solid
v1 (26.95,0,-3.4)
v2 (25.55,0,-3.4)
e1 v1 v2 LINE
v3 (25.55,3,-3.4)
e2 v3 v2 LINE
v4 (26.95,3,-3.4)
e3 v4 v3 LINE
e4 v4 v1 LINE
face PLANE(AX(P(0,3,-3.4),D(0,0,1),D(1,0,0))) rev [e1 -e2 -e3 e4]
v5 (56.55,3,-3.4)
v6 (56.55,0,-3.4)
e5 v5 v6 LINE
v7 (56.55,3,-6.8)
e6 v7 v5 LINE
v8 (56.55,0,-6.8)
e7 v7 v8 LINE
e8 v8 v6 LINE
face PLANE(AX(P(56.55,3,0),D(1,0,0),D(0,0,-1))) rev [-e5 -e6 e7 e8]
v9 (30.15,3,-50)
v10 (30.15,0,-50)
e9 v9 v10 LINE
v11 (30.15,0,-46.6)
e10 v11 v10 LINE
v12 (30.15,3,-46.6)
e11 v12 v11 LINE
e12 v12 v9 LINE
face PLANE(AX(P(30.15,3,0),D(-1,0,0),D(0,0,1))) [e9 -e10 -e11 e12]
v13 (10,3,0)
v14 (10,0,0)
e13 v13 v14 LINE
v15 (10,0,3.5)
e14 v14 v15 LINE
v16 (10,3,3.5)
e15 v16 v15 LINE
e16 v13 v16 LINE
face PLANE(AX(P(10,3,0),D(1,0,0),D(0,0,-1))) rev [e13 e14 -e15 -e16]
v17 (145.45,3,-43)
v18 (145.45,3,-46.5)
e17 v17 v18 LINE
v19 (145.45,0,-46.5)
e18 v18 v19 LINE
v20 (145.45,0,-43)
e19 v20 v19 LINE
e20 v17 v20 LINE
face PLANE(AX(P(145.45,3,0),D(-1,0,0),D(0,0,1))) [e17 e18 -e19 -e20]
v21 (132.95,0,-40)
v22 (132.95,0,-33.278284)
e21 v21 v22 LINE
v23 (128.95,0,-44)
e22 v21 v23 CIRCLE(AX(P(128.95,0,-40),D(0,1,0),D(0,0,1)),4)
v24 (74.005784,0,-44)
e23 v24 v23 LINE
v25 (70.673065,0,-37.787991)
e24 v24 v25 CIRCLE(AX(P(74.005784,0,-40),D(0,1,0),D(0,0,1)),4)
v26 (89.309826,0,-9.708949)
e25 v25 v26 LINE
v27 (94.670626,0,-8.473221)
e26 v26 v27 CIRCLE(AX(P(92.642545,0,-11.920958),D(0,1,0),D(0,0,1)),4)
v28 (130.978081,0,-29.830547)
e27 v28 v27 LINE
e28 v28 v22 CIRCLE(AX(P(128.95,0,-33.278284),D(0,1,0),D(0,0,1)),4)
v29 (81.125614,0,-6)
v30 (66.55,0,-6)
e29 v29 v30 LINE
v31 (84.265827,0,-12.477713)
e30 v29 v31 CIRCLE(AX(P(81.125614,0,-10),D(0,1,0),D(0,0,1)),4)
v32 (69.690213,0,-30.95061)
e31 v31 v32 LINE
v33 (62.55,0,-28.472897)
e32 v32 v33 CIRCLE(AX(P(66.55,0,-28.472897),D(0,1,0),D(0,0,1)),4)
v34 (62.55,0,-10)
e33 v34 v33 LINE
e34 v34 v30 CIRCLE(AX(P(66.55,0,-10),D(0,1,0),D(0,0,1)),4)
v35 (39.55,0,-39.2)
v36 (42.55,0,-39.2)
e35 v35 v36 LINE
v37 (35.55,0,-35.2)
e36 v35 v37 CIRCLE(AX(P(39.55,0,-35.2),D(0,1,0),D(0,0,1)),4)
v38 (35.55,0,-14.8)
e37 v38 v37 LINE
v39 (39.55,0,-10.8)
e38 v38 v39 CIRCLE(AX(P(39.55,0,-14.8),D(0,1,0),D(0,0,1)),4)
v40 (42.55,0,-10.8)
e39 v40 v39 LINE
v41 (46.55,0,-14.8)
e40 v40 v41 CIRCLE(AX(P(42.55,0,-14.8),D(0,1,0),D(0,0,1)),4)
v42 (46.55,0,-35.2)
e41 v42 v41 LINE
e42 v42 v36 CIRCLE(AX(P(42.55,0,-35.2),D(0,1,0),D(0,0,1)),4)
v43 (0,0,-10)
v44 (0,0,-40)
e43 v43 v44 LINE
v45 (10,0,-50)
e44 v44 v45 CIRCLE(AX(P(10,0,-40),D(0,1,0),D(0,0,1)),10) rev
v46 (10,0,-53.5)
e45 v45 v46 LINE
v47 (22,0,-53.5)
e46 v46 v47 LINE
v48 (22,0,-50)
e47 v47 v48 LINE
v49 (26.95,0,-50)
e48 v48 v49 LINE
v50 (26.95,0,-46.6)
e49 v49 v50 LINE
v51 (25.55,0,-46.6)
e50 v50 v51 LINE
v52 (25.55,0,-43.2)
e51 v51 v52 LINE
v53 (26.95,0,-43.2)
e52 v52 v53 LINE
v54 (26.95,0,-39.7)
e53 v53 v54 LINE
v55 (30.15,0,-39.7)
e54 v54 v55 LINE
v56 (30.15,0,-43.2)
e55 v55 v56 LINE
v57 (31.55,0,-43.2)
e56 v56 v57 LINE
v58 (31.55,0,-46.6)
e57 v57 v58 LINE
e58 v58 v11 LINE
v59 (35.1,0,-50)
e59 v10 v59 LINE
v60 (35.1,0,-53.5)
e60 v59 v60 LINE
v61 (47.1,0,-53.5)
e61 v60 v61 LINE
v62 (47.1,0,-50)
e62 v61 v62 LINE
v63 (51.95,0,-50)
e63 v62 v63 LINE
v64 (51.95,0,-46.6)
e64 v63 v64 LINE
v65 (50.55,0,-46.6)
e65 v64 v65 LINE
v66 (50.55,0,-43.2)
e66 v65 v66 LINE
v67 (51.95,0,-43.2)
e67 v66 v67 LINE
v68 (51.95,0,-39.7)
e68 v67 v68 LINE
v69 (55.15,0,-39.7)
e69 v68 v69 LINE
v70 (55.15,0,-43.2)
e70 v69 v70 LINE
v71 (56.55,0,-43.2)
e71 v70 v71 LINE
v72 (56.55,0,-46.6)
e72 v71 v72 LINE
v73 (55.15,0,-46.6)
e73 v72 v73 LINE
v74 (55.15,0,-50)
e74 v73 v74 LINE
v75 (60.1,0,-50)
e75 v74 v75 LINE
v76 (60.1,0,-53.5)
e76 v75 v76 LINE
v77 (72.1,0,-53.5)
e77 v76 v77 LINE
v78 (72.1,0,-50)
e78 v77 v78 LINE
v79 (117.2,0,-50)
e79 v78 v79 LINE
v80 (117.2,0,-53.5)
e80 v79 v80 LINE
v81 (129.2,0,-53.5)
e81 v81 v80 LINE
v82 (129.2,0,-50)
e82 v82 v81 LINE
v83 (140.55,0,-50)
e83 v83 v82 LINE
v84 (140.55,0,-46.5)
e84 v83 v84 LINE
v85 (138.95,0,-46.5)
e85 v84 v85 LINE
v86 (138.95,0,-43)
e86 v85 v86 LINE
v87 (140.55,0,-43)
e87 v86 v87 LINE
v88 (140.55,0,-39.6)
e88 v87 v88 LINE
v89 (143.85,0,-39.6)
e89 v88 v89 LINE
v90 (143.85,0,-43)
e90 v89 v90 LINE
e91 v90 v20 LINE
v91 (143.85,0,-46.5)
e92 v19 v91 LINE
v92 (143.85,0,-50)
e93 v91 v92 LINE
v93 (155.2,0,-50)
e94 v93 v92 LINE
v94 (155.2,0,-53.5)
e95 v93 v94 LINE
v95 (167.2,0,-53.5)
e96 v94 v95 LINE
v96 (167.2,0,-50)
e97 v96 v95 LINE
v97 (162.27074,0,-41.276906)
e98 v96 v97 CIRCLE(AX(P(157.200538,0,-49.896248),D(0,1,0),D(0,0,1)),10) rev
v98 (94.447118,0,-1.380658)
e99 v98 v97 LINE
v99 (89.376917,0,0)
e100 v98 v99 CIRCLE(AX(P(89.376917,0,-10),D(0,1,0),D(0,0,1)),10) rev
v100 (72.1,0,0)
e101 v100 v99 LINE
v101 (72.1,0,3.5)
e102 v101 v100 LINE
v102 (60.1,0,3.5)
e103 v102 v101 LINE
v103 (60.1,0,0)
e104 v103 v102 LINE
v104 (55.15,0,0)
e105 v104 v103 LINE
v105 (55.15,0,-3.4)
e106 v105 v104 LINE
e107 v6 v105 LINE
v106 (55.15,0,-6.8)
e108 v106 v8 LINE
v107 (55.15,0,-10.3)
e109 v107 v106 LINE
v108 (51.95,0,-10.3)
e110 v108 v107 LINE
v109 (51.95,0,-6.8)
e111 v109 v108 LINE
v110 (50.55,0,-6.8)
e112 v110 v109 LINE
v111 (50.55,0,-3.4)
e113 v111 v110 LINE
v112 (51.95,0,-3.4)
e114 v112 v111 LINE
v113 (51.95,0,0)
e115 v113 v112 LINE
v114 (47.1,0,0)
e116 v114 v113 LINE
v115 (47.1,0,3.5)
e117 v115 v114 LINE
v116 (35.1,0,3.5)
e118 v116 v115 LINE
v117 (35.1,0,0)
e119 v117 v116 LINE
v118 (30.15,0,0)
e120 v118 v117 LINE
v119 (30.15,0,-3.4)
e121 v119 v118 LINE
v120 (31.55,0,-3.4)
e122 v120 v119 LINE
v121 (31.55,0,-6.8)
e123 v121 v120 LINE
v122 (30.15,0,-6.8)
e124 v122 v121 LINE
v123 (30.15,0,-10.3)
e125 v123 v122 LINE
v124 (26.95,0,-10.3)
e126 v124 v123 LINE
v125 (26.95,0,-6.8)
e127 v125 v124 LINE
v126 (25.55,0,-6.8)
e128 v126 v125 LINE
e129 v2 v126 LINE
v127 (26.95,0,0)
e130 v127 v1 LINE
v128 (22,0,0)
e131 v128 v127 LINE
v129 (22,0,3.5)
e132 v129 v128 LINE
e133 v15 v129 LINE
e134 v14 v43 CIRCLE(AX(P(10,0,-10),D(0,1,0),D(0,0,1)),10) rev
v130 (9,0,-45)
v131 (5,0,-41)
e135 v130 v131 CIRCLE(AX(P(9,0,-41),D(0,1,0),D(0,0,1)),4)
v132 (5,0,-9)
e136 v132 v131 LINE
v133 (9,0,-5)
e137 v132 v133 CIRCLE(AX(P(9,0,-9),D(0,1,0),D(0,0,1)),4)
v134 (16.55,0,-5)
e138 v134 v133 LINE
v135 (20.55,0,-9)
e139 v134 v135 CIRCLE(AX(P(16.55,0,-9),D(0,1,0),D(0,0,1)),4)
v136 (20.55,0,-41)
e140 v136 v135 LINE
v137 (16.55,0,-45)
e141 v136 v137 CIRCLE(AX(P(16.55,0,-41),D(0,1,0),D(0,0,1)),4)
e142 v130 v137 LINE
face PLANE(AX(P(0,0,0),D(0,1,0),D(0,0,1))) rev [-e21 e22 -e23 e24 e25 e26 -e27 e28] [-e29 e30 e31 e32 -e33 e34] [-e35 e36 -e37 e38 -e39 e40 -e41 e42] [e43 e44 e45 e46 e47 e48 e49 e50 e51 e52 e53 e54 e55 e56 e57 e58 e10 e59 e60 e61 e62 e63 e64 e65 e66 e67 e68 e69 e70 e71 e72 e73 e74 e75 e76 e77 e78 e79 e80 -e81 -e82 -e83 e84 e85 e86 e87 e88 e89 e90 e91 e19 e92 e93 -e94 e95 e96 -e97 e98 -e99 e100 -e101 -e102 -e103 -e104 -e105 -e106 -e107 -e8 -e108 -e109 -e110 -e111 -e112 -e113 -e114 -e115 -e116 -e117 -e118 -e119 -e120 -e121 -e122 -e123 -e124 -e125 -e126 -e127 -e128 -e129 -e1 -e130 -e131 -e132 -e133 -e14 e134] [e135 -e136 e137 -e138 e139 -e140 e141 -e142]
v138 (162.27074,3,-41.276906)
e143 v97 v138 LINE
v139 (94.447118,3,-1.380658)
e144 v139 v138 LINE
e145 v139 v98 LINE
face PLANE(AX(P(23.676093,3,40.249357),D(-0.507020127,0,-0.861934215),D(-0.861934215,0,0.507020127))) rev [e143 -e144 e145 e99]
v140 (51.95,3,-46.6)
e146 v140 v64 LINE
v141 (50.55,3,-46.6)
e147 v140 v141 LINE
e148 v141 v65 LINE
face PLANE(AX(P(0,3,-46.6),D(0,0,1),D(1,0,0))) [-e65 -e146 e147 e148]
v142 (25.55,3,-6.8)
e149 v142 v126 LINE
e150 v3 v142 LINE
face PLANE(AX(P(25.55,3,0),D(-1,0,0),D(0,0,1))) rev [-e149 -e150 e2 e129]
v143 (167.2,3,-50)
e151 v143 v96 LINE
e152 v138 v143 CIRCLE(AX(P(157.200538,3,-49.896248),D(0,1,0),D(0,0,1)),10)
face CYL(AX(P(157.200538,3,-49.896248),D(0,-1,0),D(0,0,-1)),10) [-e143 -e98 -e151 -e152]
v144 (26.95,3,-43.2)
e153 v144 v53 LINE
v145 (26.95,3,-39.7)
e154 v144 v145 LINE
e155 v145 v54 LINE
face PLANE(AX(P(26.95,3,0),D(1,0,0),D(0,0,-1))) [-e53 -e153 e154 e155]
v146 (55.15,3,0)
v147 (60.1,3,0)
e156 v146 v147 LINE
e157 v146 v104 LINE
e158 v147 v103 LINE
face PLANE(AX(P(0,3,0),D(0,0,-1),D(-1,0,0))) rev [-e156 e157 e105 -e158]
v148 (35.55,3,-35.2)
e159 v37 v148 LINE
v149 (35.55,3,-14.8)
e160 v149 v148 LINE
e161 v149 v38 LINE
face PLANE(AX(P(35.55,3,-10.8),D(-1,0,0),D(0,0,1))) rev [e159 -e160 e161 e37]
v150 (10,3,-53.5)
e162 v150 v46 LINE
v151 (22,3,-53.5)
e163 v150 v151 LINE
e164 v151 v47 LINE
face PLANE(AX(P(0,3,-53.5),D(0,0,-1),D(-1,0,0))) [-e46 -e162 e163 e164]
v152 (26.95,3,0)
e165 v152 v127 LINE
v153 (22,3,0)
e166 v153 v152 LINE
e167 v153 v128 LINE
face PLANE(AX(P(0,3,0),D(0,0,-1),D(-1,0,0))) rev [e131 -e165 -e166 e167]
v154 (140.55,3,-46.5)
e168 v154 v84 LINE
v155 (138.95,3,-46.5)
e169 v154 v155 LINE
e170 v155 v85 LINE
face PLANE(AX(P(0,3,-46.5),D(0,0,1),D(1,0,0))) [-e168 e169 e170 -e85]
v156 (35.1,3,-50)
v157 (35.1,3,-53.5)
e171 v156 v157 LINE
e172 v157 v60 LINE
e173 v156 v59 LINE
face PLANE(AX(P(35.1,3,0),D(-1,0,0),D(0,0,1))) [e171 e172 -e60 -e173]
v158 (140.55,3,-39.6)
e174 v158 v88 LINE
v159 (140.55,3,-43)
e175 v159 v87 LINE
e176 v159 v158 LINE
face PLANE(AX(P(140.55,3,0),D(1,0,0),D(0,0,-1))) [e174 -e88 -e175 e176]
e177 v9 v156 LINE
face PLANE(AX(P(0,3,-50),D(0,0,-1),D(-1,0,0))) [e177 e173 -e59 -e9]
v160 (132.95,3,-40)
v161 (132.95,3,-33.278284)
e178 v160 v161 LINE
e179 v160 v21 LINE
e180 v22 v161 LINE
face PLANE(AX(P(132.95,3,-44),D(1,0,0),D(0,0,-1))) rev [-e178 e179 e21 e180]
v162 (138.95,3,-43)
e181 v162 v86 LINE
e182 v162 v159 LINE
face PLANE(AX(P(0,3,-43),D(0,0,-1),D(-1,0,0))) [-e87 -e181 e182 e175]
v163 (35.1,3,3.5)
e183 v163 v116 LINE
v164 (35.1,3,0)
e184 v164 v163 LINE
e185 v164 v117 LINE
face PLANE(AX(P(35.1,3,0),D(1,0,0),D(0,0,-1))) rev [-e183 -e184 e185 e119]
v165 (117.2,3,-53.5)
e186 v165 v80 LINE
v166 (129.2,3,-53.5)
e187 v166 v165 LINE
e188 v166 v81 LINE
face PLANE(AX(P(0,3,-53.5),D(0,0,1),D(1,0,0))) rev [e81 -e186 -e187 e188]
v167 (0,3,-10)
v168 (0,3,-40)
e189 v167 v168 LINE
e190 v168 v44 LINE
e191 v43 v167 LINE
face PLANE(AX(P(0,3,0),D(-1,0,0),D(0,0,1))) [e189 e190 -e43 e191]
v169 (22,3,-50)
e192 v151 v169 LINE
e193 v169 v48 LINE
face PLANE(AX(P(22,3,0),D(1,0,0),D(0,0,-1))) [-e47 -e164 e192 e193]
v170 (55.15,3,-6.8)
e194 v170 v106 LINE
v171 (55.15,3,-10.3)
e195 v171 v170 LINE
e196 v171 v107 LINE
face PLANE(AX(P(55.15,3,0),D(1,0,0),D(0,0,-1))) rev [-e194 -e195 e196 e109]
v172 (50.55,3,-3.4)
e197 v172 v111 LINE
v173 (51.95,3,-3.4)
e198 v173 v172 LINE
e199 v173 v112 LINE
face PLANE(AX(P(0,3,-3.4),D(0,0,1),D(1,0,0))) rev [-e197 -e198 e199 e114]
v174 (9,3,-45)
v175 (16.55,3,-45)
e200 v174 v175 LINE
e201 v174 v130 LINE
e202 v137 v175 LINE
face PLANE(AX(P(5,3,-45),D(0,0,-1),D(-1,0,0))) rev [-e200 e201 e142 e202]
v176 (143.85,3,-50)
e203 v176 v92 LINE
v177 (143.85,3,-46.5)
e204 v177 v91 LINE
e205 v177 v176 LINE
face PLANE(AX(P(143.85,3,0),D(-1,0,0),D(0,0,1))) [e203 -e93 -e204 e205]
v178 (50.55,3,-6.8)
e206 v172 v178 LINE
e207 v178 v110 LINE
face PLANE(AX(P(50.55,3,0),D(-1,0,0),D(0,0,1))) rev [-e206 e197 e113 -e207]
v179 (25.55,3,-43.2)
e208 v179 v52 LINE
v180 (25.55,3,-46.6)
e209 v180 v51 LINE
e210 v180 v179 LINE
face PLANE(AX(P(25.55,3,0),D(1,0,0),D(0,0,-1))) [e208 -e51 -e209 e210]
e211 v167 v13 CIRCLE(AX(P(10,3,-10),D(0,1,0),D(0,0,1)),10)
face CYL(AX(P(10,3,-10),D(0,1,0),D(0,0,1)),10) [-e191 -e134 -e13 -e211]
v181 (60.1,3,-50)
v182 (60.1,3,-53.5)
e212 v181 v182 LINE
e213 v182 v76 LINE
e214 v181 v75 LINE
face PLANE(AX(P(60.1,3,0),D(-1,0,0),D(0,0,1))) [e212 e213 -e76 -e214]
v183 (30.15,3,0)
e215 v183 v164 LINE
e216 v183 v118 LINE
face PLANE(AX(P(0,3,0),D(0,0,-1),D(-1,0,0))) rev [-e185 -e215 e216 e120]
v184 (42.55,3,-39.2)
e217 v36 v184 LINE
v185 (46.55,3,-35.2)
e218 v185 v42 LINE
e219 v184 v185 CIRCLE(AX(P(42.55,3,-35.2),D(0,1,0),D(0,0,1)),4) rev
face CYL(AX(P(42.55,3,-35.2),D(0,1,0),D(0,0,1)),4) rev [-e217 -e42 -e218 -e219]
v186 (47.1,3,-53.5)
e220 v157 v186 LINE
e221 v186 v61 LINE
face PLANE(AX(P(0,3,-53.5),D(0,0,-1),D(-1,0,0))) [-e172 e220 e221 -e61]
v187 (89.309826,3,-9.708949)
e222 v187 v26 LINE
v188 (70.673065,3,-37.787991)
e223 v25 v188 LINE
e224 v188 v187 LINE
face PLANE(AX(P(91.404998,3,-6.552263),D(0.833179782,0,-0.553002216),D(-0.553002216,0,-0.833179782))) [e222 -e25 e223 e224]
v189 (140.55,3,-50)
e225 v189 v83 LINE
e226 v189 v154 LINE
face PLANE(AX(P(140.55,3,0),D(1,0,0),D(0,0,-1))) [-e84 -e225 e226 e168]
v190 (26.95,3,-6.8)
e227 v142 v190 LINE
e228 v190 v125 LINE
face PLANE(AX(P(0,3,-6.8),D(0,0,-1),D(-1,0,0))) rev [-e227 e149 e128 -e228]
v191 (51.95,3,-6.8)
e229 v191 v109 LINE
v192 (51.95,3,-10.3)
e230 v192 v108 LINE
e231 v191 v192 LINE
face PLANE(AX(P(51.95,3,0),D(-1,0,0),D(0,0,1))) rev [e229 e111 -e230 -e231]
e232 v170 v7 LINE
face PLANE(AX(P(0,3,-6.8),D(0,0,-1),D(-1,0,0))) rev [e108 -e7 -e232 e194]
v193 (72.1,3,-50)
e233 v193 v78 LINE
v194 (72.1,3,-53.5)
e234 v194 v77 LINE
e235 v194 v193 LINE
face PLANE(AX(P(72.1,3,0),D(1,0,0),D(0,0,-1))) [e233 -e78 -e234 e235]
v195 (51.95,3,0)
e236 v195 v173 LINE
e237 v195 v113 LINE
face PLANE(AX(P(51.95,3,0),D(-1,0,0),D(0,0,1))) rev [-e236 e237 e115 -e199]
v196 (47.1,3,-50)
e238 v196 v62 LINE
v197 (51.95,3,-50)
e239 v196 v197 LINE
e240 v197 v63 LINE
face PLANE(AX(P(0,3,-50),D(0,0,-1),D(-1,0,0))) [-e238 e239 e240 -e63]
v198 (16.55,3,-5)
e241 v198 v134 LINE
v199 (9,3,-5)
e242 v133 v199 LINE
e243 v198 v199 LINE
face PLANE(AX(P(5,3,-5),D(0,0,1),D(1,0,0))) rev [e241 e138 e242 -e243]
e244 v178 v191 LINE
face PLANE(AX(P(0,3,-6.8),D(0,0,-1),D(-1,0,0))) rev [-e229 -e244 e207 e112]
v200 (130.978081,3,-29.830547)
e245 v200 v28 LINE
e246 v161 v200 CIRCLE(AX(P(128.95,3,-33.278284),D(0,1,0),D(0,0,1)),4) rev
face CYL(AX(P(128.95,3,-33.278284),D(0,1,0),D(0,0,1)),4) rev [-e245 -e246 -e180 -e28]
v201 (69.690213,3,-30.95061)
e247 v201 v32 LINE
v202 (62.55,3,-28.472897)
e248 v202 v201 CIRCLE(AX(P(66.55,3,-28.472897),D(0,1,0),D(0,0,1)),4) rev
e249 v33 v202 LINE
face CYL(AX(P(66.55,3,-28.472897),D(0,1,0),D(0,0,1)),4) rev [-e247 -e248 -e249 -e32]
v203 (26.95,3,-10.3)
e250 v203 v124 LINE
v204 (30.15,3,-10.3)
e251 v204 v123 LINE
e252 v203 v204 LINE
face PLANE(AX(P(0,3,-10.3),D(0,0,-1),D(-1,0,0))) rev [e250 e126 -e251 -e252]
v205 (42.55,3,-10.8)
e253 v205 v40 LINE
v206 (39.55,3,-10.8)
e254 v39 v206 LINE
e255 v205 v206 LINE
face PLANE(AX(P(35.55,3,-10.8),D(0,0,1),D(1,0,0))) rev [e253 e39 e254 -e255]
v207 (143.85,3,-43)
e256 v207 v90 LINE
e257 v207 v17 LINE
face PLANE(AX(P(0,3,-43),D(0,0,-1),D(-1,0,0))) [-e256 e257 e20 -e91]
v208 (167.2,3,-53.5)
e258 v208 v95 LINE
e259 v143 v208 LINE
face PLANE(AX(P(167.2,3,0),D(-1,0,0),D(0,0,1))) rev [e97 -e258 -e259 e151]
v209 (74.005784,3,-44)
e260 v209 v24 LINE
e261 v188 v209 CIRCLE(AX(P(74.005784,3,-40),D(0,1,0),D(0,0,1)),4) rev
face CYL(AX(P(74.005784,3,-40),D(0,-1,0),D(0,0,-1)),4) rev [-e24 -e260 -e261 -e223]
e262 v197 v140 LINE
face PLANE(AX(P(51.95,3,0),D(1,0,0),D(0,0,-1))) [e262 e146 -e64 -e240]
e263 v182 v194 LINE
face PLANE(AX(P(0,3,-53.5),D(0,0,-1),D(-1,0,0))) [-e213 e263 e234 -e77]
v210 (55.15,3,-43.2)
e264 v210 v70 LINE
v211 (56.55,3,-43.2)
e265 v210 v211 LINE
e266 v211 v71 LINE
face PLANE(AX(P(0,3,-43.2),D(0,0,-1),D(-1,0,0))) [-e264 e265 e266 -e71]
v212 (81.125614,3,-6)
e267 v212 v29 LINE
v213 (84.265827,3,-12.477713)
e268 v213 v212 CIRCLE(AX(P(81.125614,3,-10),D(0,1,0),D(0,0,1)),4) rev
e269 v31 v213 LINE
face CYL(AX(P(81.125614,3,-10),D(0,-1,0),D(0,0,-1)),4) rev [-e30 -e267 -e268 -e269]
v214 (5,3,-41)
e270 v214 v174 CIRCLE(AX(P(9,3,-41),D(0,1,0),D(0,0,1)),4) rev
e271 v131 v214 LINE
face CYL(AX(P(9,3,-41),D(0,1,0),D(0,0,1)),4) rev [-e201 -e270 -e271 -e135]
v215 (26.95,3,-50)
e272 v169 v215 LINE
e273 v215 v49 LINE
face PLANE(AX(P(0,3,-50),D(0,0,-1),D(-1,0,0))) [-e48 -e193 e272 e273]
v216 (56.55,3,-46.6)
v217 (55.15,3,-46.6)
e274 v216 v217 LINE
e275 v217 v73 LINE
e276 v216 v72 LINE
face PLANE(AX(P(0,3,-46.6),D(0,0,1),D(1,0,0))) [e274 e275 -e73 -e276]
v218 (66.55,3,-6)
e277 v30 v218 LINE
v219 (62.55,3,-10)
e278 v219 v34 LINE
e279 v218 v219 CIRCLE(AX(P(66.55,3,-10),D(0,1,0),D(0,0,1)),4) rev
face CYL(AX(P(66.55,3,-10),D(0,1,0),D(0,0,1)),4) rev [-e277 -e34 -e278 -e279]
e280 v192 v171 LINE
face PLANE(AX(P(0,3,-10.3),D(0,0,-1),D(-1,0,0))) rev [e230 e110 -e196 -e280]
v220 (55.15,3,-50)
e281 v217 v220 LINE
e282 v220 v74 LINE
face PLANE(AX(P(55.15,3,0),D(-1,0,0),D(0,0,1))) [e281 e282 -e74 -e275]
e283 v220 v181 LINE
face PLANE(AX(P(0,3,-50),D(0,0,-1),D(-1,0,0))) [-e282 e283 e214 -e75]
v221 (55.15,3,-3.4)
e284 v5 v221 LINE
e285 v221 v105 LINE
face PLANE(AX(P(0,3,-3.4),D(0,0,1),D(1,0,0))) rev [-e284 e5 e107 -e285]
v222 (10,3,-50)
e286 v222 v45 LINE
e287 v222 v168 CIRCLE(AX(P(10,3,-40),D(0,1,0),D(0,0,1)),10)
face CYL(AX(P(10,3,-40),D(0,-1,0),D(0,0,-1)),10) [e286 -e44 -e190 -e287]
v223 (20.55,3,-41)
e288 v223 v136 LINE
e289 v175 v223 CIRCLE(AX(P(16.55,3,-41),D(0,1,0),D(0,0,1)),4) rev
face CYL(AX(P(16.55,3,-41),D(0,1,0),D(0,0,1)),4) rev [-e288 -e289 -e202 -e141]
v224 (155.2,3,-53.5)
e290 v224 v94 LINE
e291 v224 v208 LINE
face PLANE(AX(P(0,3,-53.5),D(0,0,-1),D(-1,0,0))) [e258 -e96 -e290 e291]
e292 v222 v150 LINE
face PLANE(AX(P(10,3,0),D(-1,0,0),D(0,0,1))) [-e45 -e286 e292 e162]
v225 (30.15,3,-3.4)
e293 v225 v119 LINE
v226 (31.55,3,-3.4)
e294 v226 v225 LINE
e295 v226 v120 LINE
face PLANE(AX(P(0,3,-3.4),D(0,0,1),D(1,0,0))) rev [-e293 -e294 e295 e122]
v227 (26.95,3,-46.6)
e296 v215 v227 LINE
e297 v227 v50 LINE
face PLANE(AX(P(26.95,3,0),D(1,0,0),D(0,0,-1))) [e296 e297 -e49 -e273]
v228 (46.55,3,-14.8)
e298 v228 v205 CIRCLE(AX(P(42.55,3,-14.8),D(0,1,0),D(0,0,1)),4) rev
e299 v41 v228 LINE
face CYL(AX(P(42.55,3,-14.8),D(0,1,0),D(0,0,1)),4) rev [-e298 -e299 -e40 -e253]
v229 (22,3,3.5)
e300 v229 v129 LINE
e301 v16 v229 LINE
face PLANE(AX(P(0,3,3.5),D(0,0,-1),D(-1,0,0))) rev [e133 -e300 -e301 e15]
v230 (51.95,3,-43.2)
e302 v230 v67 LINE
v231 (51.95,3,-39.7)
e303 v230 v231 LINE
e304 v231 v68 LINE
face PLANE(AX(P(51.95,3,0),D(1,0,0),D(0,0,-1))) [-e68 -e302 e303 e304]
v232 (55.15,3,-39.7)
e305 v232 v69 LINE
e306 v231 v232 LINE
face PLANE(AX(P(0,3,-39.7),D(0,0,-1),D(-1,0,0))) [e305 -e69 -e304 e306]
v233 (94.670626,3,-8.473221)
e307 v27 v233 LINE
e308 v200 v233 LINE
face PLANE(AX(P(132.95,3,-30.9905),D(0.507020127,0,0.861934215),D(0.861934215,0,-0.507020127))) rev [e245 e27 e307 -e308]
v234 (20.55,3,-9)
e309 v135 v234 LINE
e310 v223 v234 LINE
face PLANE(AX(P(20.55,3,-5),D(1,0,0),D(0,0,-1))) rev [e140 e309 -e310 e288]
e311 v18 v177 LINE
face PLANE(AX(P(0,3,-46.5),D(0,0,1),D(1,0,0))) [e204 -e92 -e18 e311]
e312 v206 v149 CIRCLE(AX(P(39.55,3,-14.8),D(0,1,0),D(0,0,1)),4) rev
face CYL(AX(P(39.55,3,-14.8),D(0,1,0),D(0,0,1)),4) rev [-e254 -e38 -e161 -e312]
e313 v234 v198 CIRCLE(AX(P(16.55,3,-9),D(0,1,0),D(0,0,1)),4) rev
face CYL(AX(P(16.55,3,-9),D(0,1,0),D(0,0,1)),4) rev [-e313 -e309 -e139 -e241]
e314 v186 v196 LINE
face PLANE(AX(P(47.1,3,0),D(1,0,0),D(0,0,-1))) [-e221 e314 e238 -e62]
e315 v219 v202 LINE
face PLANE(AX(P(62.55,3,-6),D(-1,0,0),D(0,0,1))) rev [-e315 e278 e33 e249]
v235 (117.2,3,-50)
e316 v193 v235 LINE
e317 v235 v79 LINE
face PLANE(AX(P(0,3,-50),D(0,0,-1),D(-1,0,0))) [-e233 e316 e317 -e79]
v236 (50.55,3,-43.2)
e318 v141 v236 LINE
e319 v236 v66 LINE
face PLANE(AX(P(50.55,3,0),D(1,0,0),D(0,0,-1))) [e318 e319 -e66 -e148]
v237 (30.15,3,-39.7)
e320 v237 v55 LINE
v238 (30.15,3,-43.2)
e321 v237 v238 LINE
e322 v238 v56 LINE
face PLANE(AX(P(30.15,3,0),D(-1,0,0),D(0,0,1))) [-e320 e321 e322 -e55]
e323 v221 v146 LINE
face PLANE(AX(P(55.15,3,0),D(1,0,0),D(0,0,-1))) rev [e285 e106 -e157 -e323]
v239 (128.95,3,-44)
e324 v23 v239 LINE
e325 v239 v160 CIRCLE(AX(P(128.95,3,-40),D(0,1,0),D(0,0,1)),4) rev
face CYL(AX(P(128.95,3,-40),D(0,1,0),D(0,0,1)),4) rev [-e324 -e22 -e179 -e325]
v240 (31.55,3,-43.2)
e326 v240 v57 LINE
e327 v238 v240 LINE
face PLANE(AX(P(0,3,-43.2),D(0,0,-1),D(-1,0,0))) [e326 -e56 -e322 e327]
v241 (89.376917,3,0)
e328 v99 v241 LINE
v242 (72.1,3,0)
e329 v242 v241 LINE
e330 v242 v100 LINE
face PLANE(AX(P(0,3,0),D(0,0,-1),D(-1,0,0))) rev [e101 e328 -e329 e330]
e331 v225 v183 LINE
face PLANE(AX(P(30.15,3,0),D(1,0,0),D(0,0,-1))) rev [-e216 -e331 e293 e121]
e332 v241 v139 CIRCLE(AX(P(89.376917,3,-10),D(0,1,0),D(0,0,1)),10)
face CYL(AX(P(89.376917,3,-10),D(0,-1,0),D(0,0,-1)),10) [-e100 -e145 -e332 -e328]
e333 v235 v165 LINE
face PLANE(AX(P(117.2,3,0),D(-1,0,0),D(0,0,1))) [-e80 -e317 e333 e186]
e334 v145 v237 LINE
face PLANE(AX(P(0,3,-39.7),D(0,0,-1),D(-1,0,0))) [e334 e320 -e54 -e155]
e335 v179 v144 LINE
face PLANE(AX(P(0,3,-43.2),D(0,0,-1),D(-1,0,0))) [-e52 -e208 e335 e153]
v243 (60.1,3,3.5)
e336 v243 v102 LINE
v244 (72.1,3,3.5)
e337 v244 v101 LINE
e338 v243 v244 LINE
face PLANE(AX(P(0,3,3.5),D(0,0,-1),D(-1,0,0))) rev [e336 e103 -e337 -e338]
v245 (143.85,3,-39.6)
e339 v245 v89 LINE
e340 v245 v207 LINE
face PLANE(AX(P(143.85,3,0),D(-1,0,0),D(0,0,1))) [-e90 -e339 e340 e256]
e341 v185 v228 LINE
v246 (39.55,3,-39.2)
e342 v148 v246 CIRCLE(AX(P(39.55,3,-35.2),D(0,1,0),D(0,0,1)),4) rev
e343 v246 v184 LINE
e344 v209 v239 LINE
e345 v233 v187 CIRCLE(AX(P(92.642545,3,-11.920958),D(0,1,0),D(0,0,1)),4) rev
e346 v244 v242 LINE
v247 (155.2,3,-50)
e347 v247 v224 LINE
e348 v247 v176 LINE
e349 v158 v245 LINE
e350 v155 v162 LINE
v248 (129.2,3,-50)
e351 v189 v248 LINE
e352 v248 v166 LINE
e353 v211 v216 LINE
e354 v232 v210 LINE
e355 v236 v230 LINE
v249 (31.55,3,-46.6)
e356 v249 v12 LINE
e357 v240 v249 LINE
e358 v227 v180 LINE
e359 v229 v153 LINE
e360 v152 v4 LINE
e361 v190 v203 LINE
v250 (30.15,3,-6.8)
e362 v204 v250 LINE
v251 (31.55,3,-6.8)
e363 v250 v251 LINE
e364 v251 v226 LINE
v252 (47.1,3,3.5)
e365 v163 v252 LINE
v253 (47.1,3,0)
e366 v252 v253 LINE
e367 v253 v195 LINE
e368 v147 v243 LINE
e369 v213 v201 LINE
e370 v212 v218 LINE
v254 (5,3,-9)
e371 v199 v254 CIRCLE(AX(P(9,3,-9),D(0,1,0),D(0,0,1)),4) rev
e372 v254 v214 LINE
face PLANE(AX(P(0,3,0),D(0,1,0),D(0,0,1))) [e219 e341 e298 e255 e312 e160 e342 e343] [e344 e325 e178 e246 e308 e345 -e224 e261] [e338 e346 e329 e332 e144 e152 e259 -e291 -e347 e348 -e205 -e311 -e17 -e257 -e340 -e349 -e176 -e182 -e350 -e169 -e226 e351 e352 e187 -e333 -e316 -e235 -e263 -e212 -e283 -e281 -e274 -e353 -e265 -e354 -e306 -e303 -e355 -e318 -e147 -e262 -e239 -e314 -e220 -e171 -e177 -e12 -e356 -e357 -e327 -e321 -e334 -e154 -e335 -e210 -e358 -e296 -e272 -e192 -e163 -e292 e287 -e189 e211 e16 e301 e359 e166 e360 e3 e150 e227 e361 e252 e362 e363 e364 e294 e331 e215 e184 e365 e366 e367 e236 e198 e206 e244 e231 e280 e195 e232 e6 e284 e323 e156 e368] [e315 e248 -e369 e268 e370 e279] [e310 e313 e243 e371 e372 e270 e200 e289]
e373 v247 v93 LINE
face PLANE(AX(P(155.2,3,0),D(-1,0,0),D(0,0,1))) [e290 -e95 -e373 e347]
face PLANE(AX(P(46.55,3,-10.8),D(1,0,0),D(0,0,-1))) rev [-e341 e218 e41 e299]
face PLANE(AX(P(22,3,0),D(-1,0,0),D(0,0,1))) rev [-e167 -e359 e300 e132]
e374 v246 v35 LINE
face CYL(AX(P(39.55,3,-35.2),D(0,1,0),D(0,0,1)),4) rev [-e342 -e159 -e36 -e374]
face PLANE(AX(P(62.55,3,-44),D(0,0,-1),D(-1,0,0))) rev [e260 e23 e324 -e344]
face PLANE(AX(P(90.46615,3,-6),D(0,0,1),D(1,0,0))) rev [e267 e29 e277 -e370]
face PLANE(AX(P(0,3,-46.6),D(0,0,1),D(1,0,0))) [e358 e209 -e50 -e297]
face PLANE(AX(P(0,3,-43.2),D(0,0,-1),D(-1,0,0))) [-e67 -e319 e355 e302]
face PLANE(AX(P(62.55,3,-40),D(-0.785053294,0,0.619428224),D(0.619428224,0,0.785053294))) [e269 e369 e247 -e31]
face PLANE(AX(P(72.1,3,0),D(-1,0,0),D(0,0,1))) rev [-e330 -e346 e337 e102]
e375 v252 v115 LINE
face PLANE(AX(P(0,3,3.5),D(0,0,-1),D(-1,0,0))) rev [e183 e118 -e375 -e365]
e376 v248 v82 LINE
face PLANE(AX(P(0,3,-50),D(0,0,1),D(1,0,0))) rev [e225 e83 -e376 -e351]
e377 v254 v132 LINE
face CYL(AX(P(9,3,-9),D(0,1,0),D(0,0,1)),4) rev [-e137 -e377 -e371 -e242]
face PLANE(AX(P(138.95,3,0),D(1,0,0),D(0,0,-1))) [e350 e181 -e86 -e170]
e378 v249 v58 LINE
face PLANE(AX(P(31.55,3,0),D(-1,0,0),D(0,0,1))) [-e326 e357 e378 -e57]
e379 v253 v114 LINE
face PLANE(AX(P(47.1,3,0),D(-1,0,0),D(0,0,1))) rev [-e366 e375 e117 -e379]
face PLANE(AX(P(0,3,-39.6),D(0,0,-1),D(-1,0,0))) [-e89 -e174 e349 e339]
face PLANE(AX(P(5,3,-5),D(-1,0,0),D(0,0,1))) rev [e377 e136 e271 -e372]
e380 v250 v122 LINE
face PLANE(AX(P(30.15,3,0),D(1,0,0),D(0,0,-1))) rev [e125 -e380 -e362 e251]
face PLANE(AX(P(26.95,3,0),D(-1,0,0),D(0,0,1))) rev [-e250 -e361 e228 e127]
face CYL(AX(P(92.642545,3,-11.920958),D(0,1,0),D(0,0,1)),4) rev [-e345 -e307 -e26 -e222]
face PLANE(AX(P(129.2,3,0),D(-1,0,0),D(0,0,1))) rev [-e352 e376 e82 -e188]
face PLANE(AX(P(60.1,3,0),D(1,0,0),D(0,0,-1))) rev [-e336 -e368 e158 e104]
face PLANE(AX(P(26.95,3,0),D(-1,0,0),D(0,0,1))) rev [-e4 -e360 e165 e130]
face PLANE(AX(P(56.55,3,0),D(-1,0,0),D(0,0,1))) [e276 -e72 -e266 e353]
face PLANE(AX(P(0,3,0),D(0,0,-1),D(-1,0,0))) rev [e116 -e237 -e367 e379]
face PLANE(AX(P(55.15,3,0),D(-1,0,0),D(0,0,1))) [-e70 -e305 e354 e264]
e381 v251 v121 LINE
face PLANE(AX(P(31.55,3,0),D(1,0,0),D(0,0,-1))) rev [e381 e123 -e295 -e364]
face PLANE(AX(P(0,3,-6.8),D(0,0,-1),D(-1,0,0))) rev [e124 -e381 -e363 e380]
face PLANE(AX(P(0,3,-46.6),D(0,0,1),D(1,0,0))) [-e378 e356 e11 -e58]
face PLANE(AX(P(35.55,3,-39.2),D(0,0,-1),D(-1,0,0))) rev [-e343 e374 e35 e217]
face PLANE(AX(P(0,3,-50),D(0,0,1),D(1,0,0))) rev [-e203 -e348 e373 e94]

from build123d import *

# Parameters (mm, degrees)
EXTRUDE_1_DEPTH     = 3
FILLET_1_R          = 10
FILLET_2_R          = 10
SKETCH_2_W          = 11
SKETCH_2_H          = 28.4
SKETCH_2_W_2        = 15.55
SKETCH_2_H_2        = 40
CUT_EXTRUDE_1_DEPTH = 176.576963147
FILLET_3_R          = 4
EXTRUDE_START       = -3
EXTRUDE_2_DEPTH     = 3
FILLET_4_R          = 4


# Some blends are built 0.0001 mm under size
with BuildPart() as part:
    # 草图1 → 凸台-拉伸1 (new body)
    with BuildSketch(Plane(origin=(0, 0, 0), x_dir=(1, 0, 0), z_dir=(0, 1, 0))):
        Polygon((0, 0), (10, 0), (10, -3.5), (22, -3.5), (22, 0), (26.95, 0), (26.95, 3.4), (25.55, 3.4), (25.55, 6.8), (26.95, 6.8), (26.95, 10.3), (30.15, 10.3), (30.15, 6.8), (31.55, 6.8), (31.55, 3.4), (30.15, 3.4), (30.15, 0), (35.1, 0), (35.1, -3.5), (47.1, -3.5), (47.1, 0), (51.95, 0), (51.95, 3.4), (50.55, 3.4), (50.55, 6.8), (51.95, 6.8), (51.95, 10.3), (55.15, 10.3), (55.15, 6.8), (56.55, 6.8), (56.55, 3.4), (55.15, 3.4), (55.15, 0), (60.1, 0), (60.1, -3.5), (72.1, -3.5), (72.1, 0), (92.1, 0), (177.1, 50), (167.2, 50), (167.2, 53.5), (155.2, 53.5), (155.2, 50), (143.85, 50), (143.85, 46.5), (145.45, 46.5), (145.45, 43), (143.85, 43), (143.85, 39.6), (140.55, 39.6), (140.55, 43), (138.95, 43), (138.95, 46.5), (140.55, 46.5), (140.55, 50), (129.2, 50), (129.2, 53.5), (117.2, 53.5), (117.2, 50), (72.1, 50), (72.1, 53.5), (60.1, 53.5), (60.1, 50), (55.15, 50), (55.15, 46.6), (56.55, 46.6), (56.55, 43.2), (55.15, 43.2), (55.15, 39.7), (51.95, 39.7), (51.95, 43.2), (50.55, 43.2), (50.55, 46.6), (51.95, 46.6), (51.95, 50), (47.1, 50), (47.1, 53.5), (35.1, 53.5), (35.1, 50), (30.15, 50), (30.15, 46.6), (31.55, 46.6), (31.55, 43.2), (30.15, 43.2), (30.15, 39.7), (26.95, 39.7), (26.95, 43.2), (25.55, 43.2), (25.55, 46.6), (26.95, 46.6), (26.95, 50), (22, 50), (22, 53.5), (10, 53.5), (10, 50), (0, 50), align=None)
    extrude(amount=EXTRUDE_1_DEPTH)

    # 圆角1
    # the kernel refuses this fillet: 10 mm, written as the material it takes off along each edge
    with BuildSketch(Plane(origin=(177.1, -43.011578588, -50), x_dir=(-0.8619342151577696, 0, 0.5070201265633938), z_dir=(0, 1, 0))) as fillet_1_piece_1:
        with BuildLine():
            CenterArc((17.204631435, -10), FILLET_1_R, 90, 60.128922386)
            Line((8.53314873, -5.019499253), (8.359719076, -4.919889238))
            ThreePointArc((8.359719076, -4.919889238), (4.16517034, -2.68213647), (-0.101404025, -0.172386843))
            Line((-0.101404025, -0.172386843), (0, 0.2))
            Line((0, 0.2), (17.204631435, 0.2))
            Line((17.204631435, 0.2), (17.204631435, 0))
        make_face()
    extrude(amount=89.023157177, mode=Mode.SUBTRACT)

    # 圆角2
    fillet_2_edges = [part.edges().sort_by_distance(p)[0] for p in [
        (92.1, 1.5, 0),
        (0, 1.5, -50),
        (0, 1.5, 0),
    ]]
    fillet(fillet_2_edges, radius=FILLET_2_R - 0.0001)  # a hair under: the kernel refuses the full size

    # 草图2 → 切除-拉伸1 (cut, through all)
    with BuildSketch(Plane.XZ):
        Polygon((62.55, -6), (62.55, -44), (132.95, -44), (132.95, -30.990499855), (90.466150246, -6), align=None)
        with Locations((41.05, -25)):
            Rectangle(SKETCH_2_W, SKETCH_2_H)
        with Locations((12.775, -25)):
            Rectangle(SKETCH_2_W_2, SKETCH_2_H_2)
    extrude(amount=-CUT_EXTRUDE_1_DEPTH, mode=Mode.SUBTRACT)

    # 圆角3
    fillet_3_edges = [part.edges().sort_by_distance(p)[0] for p in [
        (62.55, 1.5, -6),
        (90.466150246, 1.5, -6),
        (132.95, 1.5, -30.990499855),
        (132.95, 1.5, -44),
        (62.55, 1.5, -44),
        (35.55, 1.5, -39.2),
        (35.55, 1.5, -10.8),
        (46.55, 1.5, -10.8),
        (46.55, 1.5, -39.2),
        (5, 1.5, -45),
        (5, 1.5, -5),
        (20.55, 1.5, -5),
        (20.55, 1.5, -45),
    ]]
    fillet(fillet_3_edges, radius=FILLET_3_R)

    # 草图3 → 凸台-拉伸2 (add)
    with BuildSketch(Plane.XZ.offset(EXTRUDE_START)):
        with BuildLine():
            Line((62.55, -40), (89.376917077, -6))
            ThreePointArc((89.376917077, -6), (90.427881528, -6.140534529), (91.404997583, -6.552263139))
            Line((91.404997583, -6.552263139), (66.55, -44))
            ThreePointArc((66.55, -44), (63.721572875, -42.828427125), (62.55, -40))
        make_face()
    extrude(amount=EXTRUDE_2_DEPTH)

    # 圆角4
    fillet_4_edges = [part.edges().sort_by_distance(p)[0] for p in [
        (91.404997583, 1.5, -6.552263139),
        (66.55, 1.5, -44),
        (89.376917077, 1.5, -6),
        (62.55, 1.5, -40),
    ]]
    fillet(fillet_4_edges, radius=FILLET_4_R)


solid = part.part
